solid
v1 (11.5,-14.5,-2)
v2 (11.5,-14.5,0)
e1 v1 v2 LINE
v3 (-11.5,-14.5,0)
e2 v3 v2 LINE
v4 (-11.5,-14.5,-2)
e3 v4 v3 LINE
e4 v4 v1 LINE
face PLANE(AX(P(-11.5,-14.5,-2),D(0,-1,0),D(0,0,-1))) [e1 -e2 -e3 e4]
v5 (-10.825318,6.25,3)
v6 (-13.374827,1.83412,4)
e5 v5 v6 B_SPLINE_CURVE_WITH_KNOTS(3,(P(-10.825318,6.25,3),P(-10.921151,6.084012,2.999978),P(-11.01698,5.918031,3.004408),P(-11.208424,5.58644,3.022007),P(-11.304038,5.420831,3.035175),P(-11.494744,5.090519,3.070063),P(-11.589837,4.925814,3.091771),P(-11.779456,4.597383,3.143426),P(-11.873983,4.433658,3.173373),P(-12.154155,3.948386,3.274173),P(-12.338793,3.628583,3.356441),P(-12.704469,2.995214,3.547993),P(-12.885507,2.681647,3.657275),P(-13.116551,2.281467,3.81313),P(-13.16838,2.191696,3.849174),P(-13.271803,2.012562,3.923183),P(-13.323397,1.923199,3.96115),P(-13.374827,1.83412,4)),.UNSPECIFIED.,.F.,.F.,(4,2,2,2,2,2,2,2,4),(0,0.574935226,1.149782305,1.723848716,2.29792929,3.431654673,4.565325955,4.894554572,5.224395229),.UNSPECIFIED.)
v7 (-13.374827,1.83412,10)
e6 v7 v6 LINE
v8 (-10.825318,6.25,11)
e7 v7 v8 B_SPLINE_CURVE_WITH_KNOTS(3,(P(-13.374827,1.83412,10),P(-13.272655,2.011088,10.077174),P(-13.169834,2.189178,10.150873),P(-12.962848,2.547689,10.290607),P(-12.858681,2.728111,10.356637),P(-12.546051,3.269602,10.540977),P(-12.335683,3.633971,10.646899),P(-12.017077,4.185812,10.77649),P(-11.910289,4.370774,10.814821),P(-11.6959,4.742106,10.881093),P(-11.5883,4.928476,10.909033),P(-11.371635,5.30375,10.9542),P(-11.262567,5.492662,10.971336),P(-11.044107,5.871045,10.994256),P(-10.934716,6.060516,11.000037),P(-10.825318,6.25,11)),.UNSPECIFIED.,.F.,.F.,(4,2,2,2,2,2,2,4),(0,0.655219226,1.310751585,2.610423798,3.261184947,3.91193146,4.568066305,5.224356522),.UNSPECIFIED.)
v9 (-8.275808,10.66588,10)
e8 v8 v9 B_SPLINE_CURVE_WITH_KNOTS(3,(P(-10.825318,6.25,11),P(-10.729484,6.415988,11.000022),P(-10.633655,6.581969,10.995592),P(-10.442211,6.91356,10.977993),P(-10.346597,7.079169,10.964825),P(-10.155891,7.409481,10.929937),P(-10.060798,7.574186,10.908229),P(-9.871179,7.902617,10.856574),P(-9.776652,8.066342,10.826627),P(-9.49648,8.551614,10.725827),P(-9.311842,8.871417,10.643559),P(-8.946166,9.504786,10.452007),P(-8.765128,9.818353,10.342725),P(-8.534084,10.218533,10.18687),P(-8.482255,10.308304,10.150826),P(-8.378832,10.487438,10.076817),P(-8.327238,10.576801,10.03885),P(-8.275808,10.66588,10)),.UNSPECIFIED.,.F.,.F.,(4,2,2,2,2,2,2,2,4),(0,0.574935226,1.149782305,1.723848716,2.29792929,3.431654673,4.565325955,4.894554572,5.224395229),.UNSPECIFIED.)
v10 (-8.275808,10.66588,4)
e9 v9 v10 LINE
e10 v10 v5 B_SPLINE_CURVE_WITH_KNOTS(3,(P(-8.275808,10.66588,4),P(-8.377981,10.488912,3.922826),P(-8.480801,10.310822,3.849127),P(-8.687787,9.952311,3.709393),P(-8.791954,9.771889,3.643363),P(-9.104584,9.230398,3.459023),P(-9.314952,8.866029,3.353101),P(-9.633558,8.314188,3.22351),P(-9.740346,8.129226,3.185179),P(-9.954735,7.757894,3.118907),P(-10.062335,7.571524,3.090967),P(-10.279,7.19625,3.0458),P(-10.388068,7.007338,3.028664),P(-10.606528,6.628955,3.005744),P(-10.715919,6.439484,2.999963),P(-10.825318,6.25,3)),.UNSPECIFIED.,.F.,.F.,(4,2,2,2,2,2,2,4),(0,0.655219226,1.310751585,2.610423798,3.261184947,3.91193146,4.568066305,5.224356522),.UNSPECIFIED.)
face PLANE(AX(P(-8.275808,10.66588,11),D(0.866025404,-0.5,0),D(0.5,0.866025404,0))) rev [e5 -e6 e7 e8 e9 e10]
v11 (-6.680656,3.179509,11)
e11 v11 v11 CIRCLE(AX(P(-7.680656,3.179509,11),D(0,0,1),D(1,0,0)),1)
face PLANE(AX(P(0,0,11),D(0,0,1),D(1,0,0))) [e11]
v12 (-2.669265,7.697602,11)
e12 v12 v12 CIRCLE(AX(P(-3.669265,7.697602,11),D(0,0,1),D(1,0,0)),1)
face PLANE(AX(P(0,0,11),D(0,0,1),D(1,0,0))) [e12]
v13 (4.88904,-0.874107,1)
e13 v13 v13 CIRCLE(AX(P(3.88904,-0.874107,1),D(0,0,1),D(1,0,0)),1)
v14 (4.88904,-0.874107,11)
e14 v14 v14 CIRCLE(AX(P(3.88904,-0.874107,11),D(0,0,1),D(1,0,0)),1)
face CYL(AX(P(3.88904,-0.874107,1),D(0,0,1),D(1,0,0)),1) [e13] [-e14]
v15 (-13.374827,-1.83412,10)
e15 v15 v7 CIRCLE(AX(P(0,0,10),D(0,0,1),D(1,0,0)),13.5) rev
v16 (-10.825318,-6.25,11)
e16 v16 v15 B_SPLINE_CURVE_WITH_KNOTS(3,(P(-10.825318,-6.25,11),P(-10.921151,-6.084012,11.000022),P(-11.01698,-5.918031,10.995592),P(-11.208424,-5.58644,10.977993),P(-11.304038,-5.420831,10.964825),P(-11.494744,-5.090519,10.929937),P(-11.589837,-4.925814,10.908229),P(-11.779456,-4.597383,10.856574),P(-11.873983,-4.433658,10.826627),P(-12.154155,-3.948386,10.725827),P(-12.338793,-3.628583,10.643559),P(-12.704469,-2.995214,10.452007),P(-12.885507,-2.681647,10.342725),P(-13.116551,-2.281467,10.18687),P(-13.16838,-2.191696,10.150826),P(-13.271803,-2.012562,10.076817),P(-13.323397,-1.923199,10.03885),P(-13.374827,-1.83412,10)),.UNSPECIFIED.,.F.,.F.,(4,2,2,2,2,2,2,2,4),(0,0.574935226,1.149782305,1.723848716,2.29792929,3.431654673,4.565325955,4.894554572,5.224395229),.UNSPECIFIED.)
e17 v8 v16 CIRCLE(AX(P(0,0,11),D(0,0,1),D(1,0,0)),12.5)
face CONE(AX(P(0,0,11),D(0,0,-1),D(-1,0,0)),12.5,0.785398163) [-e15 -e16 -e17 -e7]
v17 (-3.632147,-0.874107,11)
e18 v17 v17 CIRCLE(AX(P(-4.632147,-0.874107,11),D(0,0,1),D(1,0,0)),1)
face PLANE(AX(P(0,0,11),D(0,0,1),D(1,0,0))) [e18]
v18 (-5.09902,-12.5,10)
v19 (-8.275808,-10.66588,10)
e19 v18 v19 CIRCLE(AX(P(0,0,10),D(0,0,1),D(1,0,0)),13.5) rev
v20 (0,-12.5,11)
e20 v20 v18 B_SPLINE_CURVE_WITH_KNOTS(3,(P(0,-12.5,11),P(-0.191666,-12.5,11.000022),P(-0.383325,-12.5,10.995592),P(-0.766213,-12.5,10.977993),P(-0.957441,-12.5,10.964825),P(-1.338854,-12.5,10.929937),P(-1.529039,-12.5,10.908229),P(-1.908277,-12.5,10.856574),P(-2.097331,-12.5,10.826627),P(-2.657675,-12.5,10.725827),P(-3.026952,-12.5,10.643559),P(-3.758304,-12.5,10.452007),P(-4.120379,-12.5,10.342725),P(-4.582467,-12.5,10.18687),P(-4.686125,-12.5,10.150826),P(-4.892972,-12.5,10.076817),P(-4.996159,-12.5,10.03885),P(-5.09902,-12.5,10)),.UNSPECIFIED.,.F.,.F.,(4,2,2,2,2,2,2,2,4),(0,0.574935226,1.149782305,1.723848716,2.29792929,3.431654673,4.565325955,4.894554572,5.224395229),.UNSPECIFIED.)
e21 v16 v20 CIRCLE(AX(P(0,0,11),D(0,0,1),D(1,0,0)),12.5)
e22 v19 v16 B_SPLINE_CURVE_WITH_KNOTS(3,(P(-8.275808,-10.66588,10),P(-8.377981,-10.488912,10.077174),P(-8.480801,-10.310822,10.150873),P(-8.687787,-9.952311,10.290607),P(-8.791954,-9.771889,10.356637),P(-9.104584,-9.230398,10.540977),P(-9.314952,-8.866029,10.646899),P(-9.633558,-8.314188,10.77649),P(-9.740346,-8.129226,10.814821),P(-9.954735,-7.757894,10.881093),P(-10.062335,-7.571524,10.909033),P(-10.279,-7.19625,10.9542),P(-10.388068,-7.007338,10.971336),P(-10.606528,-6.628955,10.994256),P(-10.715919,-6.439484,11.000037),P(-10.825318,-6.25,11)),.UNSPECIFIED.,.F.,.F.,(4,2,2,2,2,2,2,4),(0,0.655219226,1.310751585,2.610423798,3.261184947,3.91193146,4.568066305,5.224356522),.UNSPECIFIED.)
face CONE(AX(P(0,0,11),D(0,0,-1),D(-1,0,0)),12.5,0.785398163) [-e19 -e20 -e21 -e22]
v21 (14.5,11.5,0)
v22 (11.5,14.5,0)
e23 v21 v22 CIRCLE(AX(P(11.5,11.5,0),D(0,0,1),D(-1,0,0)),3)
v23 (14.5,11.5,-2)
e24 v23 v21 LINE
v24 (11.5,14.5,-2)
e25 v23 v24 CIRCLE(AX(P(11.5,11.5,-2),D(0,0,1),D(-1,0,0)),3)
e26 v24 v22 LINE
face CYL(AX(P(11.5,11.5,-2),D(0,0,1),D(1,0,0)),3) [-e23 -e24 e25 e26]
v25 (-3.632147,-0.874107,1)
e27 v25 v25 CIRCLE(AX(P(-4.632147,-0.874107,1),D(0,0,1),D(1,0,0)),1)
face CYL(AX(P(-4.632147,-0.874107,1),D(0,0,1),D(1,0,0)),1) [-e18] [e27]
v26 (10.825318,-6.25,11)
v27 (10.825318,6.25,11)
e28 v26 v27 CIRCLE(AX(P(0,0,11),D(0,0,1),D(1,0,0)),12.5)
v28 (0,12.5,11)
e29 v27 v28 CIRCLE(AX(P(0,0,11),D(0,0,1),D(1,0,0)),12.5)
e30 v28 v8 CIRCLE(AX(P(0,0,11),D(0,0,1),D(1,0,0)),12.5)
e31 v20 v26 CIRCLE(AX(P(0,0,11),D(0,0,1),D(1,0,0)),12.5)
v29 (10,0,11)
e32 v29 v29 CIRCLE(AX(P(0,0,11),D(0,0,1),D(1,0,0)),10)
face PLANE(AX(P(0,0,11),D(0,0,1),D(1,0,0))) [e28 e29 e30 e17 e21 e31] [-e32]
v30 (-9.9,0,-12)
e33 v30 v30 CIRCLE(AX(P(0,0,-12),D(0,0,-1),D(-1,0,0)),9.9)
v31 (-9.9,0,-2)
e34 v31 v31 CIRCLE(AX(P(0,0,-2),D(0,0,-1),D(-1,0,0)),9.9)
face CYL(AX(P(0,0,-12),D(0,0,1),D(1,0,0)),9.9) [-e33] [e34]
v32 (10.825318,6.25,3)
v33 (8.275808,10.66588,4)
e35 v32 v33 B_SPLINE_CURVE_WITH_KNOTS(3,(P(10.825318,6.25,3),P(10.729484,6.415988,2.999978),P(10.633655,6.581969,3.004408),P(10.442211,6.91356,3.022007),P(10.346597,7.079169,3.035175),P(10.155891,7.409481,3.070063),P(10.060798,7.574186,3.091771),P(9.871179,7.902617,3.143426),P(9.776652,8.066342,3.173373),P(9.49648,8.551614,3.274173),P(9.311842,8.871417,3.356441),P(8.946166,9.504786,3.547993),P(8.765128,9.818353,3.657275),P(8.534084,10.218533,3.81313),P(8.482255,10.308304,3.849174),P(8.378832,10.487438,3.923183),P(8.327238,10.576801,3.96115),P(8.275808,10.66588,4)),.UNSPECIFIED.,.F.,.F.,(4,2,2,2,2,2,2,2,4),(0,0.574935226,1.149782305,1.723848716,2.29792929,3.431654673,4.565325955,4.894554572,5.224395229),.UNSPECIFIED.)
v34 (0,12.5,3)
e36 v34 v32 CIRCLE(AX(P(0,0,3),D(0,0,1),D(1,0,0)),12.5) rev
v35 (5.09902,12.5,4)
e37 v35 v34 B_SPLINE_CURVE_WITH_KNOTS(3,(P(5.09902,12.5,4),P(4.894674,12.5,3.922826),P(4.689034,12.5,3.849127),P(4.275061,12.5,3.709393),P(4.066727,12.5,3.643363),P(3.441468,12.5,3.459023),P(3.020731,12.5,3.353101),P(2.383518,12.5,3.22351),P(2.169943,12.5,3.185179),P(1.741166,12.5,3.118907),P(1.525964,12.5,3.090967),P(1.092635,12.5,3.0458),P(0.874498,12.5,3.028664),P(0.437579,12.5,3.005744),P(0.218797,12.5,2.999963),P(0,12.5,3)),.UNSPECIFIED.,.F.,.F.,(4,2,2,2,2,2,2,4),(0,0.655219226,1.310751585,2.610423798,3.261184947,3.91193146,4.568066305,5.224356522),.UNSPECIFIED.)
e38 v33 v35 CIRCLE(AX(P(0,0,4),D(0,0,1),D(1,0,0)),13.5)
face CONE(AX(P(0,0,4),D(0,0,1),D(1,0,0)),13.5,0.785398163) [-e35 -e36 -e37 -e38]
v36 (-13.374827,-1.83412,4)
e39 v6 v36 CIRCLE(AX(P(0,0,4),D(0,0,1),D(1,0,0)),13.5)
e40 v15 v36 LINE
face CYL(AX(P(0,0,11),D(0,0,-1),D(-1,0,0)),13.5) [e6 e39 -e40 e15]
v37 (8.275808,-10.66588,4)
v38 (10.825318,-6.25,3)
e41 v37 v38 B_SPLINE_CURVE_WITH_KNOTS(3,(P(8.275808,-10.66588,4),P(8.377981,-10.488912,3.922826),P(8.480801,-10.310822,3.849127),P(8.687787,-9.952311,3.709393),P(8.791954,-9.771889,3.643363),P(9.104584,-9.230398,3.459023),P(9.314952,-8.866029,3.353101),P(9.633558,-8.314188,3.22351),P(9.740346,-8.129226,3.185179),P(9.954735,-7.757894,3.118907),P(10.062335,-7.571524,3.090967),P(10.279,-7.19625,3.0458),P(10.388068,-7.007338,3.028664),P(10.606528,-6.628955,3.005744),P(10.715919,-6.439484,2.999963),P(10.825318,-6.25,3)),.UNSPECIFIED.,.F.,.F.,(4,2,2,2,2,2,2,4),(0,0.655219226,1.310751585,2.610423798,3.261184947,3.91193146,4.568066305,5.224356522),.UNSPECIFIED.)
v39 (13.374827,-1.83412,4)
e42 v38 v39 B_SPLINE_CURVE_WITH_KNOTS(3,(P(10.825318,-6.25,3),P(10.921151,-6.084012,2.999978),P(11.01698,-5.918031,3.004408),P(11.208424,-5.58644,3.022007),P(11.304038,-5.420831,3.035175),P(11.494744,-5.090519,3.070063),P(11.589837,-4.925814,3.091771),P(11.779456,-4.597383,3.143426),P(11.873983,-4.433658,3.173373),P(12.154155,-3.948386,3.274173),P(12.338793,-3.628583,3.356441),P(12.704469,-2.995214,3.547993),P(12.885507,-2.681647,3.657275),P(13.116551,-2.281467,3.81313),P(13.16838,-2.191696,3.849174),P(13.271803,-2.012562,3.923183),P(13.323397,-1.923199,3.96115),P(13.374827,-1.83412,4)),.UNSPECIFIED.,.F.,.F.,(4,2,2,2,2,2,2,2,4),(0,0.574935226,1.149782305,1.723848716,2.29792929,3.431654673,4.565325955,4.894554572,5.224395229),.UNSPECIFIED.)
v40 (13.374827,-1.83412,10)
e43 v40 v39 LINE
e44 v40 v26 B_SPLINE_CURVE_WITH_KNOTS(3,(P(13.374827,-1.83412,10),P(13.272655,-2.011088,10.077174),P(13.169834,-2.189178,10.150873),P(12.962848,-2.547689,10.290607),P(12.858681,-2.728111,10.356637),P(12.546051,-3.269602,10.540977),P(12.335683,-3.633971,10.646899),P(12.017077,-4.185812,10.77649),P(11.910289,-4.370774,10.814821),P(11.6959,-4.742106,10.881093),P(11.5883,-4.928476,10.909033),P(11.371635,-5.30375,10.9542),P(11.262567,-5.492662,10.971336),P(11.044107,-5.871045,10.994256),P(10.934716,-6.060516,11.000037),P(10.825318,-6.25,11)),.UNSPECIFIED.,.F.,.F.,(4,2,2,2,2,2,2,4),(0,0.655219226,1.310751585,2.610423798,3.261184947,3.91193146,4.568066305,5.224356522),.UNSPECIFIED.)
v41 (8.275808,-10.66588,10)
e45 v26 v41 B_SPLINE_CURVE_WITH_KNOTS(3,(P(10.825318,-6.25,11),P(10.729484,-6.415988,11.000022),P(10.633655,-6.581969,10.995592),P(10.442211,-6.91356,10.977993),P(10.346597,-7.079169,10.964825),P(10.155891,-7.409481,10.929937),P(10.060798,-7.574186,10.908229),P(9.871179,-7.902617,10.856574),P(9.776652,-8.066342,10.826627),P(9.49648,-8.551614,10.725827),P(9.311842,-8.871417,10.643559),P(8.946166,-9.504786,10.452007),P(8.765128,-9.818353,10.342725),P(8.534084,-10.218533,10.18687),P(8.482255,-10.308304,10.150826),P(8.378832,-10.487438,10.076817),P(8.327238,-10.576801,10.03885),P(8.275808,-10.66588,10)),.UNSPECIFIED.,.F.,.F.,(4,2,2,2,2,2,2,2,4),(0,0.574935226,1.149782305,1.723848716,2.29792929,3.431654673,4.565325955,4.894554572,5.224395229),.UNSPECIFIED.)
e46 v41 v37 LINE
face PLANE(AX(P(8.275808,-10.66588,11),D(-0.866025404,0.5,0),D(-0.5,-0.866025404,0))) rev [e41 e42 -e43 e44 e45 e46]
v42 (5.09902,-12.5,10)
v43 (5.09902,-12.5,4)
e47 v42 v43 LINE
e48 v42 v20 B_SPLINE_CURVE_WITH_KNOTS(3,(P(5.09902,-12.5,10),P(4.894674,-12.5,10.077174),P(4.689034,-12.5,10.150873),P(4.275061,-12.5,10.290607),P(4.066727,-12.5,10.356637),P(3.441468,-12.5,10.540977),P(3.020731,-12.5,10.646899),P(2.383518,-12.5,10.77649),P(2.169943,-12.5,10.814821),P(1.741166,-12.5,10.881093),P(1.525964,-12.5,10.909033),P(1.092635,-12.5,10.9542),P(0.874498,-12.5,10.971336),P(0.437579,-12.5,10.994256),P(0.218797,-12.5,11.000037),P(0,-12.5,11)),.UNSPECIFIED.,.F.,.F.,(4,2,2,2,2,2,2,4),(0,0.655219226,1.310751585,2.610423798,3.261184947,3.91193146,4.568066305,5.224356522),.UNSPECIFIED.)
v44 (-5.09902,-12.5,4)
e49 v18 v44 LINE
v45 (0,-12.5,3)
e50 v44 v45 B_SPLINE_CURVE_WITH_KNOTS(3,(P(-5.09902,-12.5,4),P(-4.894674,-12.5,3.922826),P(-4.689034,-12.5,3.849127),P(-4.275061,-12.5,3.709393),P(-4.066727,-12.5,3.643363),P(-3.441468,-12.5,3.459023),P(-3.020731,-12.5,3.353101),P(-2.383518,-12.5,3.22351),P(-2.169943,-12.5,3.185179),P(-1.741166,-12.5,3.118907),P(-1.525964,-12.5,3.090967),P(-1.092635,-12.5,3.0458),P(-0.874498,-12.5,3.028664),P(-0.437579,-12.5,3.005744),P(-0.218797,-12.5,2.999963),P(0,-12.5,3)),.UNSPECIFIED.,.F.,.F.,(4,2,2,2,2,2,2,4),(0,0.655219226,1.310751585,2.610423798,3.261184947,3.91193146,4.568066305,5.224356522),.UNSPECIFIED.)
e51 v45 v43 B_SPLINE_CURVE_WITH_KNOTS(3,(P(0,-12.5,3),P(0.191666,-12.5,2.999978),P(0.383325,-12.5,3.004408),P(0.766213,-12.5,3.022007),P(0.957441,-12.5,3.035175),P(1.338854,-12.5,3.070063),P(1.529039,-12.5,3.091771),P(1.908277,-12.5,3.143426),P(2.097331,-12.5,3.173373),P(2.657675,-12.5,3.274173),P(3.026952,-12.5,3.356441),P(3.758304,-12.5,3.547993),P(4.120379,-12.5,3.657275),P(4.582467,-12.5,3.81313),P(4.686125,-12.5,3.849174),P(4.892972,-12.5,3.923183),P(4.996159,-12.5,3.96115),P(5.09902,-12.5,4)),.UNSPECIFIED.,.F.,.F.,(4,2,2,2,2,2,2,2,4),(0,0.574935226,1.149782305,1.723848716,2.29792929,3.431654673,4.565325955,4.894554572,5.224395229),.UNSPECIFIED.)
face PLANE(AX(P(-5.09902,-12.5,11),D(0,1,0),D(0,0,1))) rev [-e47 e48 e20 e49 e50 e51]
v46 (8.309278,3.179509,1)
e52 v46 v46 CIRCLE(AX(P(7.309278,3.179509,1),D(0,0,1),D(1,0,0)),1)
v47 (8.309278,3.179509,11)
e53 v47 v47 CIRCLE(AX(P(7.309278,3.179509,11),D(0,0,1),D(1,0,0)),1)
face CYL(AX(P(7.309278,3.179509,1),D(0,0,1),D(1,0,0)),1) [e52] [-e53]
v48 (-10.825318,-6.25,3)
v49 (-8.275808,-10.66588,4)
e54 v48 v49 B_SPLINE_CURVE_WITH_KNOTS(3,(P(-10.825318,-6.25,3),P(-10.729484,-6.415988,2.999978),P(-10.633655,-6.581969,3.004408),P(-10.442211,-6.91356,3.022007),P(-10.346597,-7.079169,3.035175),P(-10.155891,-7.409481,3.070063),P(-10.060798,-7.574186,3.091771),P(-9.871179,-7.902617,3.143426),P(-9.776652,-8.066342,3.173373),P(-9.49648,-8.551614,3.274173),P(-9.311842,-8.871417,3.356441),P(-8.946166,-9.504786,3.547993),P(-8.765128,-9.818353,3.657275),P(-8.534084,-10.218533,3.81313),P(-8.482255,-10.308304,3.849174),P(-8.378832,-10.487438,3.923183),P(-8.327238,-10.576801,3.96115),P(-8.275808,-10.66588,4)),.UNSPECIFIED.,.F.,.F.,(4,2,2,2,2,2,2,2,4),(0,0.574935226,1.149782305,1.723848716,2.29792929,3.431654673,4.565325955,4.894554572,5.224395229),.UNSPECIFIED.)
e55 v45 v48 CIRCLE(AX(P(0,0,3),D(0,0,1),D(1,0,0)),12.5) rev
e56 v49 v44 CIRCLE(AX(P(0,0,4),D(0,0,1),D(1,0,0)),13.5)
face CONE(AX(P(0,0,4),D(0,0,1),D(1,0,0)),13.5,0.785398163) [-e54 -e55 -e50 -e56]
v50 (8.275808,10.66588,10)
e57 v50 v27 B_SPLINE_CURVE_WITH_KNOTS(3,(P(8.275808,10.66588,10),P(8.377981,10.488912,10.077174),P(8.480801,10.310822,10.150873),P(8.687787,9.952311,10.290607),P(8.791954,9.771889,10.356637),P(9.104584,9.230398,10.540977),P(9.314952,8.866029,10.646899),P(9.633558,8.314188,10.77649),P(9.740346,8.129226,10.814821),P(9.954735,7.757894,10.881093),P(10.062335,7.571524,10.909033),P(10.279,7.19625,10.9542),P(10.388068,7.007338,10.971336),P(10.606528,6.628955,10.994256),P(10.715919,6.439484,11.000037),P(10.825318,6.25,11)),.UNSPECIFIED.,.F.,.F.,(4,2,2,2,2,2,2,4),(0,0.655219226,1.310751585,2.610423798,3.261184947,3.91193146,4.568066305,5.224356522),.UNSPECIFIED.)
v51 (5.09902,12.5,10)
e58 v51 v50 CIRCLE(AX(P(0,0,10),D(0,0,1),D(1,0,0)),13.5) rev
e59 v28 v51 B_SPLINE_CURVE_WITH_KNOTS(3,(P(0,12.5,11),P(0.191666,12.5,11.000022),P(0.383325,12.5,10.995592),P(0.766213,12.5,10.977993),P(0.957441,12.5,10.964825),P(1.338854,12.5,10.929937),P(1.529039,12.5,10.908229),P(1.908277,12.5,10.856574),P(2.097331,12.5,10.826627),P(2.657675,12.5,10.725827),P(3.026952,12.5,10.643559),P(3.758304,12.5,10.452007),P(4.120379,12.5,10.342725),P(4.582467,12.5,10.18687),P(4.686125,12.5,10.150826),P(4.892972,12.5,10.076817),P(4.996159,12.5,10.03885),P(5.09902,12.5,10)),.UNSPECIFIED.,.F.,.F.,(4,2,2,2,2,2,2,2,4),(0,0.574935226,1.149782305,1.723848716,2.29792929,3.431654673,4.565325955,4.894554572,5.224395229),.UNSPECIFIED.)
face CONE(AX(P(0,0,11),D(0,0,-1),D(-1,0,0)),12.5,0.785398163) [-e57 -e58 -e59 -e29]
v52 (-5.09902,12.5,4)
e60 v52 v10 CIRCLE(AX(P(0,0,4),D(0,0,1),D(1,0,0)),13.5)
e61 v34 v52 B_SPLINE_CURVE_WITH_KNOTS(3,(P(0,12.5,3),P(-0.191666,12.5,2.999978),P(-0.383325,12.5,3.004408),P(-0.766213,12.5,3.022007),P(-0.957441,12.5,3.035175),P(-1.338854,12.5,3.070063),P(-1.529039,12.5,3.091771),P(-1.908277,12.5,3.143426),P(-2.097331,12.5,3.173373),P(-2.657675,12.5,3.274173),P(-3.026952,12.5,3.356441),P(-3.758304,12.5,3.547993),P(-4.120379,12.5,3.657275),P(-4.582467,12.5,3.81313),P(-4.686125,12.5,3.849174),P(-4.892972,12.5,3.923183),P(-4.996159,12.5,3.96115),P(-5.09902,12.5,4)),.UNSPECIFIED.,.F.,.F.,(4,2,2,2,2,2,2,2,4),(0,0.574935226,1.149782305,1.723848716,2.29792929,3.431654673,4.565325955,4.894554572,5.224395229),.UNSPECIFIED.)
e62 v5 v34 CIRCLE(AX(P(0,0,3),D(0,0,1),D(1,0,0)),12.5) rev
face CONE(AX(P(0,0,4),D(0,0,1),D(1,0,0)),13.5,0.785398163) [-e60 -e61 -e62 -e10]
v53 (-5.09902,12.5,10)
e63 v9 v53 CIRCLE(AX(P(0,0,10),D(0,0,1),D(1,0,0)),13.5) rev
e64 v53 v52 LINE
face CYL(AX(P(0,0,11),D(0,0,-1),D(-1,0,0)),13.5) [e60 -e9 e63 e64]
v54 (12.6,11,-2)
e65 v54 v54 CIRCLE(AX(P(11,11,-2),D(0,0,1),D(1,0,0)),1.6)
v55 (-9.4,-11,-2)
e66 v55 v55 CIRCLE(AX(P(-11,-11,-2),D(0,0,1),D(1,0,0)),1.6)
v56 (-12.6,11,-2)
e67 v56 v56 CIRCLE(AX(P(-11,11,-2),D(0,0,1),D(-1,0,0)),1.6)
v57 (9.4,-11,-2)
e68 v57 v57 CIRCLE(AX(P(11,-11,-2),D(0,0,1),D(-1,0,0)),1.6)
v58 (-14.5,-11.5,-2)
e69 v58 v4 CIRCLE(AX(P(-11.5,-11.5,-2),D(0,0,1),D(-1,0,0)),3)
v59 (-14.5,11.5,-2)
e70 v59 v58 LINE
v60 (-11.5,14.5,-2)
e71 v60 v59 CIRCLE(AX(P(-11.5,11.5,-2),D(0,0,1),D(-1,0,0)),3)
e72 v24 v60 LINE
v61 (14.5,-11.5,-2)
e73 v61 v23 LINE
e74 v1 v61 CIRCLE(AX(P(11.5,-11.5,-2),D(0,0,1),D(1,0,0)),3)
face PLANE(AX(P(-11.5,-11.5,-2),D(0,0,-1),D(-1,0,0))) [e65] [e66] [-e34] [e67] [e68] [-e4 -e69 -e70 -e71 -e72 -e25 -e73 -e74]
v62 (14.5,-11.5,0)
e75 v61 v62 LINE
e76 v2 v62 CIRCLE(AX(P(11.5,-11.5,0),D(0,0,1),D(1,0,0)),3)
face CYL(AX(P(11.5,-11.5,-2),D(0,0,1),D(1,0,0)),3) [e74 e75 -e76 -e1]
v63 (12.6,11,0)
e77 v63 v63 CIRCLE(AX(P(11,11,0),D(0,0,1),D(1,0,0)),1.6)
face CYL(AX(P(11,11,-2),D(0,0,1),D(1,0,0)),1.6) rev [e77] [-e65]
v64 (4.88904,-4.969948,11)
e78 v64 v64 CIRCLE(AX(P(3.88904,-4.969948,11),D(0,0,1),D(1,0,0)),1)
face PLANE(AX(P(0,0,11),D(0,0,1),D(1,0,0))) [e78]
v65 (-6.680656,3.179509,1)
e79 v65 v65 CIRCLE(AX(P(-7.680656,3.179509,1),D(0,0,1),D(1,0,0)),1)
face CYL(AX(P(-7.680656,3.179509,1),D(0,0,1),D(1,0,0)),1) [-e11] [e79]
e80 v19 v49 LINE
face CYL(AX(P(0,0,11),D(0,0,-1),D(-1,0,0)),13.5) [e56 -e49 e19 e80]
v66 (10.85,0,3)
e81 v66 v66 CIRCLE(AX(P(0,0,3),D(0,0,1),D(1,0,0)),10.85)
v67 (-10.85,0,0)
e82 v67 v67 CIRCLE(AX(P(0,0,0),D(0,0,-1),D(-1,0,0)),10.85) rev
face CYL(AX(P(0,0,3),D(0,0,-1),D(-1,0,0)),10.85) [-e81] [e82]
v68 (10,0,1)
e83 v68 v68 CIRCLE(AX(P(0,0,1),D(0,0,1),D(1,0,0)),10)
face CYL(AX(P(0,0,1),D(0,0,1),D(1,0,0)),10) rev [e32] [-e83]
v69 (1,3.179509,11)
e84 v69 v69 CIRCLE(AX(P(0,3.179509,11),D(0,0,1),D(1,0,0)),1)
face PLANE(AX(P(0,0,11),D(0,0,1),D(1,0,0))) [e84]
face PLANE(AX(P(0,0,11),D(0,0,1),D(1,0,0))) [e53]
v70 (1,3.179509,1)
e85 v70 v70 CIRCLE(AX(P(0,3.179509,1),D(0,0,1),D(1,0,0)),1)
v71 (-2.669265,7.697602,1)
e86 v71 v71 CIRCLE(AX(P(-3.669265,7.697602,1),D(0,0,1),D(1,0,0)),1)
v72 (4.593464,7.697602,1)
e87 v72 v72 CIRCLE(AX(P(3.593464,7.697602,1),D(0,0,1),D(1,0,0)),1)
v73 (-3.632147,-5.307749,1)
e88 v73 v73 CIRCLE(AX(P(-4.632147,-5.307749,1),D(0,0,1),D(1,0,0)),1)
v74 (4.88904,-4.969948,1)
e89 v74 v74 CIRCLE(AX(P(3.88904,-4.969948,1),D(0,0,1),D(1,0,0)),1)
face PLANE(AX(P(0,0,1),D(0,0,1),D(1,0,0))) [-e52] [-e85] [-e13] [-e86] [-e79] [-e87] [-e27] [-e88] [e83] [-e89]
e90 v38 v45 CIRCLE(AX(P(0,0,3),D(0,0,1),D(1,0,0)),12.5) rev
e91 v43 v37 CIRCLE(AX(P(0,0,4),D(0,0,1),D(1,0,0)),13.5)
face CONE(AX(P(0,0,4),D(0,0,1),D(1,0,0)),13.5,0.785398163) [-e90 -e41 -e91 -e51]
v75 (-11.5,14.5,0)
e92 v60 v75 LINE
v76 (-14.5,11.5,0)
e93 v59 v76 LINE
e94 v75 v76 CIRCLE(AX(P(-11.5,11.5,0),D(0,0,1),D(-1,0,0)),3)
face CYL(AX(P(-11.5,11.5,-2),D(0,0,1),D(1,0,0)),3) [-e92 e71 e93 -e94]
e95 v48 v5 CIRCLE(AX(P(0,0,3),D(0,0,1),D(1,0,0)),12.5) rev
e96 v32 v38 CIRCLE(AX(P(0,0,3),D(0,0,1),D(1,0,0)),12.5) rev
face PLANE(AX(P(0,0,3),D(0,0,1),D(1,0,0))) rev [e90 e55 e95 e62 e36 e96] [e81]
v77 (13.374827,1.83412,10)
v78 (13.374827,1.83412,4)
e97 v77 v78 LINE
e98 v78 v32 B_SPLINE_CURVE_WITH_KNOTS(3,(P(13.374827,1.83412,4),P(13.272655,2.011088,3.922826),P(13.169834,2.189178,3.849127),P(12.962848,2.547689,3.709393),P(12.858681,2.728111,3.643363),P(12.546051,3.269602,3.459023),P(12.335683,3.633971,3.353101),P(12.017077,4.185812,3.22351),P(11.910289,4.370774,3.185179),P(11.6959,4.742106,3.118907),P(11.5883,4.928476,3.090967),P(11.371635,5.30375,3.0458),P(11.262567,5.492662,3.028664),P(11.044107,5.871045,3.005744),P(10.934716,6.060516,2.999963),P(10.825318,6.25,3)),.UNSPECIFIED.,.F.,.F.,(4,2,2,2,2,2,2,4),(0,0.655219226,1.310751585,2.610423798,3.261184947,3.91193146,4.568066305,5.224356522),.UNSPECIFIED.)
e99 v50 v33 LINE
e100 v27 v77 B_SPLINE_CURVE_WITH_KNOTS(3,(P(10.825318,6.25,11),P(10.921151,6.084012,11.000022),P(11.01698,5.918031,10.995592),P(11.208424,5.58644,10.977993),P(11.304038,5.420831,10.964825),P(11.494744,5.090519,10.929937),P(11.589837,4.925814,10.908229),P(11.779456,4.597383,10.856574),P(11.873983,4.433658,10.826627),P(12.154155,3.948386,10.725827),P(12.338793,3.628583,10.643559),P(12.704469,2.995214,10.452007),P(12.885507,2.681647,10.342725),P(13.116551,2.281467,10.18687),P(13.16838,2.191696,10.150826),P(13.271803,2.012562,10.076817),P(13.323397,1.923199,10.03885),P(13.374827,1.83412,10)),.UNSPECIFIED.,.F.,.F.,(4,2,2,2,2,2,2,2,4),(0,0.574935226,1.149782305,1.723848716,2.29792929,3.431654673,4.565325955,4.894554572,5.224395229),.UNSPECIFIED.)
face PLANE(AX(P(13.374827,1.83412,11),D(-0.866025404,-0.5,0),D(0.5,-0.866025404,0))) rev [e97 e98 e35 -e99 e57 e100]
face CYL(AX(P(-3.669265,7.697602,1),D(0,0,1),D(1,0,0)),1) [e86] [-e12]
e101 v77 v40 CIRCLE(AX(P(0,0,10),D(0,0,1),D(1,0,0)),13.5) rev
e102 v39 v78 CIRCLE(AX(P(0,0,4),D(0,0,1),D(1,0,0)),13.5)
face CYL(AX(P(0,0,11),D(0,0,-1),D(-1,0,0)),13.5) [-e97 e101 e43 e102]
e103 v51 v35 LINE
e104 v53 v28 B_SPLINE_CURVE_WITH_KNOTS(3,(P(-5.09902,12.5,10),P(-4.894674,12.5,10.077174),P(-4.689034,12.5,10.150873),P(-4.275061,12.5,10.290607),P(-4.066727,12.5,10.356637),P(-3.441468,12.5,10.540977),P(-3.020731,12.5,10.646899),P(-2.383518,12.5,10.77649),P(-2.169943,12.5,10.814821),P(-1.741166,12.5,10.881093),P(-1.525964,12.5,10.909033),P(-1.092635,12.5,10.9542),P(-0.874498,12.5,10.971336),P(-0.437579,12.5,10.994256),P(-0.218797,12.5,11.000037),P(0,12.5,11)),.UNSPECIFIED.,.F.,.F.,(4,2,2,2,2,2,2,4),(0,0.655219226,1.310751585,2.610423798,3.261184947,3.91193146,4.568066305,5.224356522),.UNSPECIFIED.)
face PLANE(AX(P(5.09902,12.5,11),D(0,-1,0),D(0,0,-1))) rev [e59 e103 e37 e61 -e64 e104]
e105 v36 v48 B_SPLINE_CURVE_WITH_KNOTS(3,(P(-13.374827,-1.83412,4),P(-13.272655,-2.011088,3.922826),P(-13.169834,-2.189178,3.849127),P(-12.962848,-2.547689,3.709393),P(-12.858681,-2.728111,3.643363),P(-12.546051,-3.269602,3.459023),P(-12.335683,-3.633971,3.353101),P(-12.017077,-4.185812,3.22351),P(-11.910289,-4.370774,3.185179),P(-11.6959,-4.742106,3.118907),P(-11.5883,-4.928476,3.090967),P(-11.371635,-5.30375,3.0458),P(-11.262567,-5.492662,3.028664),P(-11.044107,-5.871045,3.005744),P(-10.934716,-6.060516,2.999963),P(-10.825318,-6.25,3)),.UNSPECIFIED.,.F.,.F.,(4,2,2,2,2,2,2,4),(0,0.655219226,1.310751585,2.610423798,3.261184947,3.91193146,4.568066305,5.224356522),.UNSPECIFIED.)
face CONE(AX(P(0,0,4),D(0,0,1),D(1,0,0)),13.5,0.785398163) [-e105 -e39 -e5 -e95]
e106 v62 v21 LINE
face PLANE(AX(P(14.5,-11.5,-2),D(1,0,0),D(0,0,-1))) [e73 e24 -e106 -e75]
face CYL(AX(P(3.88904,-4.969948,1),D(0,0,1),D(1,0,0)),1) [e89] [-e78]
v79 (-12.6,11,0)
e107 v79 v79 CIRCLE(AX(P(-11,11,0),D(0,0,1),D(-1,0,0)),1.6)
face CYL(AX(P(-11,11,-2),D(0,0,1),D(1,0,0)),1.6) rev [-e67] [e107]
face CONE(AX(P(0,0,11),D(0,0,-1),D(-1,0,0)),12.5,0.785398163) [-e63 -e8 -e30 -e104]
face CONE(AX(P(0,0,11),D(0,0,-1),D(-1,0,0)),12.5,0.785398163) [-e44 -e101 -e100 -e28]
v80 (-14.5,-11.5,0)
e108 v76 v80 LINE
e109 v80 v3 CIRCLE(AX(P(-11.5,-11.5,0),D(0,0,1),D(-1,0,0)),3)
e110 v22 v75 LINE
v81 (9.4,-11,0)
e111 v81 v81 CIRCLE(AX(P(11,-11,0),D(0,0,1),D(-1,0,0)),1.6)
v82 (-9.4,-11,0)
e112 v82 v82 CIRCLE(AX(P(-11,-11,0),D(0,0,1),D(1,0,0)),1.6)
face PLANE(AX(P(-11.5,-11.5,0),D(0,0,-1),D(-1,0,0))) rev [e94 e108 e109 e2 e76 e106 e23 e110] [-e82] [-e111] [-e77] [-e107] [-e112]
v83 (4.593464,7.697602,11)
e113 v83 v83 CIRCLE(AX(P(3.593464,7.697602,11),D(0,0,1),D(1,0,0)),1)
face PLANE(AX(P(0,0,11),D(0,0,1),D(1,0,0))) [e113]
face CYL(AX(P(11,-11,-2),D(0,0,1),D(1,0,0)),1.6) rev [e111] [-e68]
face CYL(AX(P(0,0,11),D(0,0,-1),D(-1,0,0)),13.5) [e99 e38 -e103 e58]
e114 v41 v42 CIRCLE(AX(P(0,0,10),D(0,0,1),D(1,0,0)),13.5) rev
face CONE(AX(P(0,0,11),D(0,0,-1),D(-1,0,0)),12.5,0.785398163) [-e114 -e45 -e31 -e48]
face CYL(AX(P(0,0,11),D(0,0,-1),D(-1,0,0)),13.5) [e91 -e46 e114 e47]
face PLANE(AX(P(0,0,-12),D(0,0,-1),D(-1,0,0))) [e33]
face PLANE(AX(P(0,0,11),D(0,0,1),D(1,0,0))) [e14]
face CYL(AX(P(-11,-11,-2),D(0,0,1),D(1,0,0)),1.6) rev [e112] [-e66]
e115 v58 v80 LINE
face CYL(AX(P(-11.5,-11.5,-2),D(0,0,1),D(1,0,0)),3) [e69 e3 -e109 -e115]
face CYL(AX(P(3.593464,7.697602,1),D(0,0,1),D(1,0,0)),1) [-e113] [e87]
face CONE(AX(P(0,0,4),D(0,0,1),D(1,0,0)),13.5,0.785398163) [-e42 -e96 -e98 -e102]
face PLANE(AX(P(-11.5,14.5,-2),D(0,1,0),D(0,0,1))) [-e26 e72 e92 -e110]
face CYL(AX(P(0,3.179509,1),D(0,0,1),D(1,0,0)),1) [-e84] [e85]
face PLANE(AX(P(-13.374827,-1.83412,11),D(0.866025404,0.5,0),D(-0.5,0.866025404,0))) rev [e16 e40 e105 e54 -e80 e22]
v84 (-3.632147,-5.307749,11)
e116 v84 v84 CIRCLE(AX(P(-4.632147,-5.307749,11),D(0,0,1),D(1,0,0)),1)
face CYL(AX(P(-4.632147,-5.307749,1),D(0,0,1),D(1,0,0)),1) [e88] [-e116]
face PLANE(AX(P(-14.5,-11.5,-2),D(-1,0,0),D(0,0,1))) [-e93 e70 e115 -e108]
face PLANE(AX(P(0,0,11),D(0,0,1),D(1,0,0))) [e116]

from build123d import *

# Parameters (mm, degrees)
SKETCH_1_R          = 1.6
EXTRUDE_1_DEPTH     = 2
SKETCH_2_R          = 10.85
EXTRUDE_2_DEPTH     = 3
EXTRUDE_3_DEPTH     = 8
SKETCH_4_R          = 9.9
EXTRUDE_4_DEPTH     = 10
CHAMFER_1_SIZE      = 1
CHAMFER_2_SIZE      = 1
SKETCH_5_R          = 10
SKETCH_5_R_2        = 1
CUT_EXTRUDE_1_DEPTH = 10


with BuildPart() as part:
    # 草图1 → 凸台-拉伸1 (new body)
    with BuildSketch(Plane.XY):
        with BuildLine():
            Line((-11.5, -14.5), (11.5, -14.5))
            ThreePointArc((11.5, -14.5), (13.621320344, -13.621320344), (14.5, -11.5))
            Line((14.5, -11.5), (14.5, 11.5))
            ThreePointArc((14.5, 11.5), (13.621320344, 13.621320344), (11.5, 14.5))
            Line((11.5, 14.5), (-11.5, 14.5))
            ThreePointArc((-11.5, 14.5), (-13.621320344, 13.621320344), (-14.5, 11.5))
            Line((-14.5, 11.5), (-14.5, -11.5))
            ThreePointArc((-14.5, -11.5), (-13.621320344, -13.621320344), (-11.5, -14.5))
        make_face()
        with Locations((11, 11)):
            Circle(SKETCH_1_R, mode=Mode.SUBTRACT)
        with Locations(Location((-11, 11, 0), (0, 0, 180))):
            Circle(SKETCH_1_R, mode=Mode.SUBTRACT)
        with Locations((-11, -11)):
            Circle(SKETCH_1_R, mode=Mode.SUBTRACT)
        with Locations(Location((11, -11, 0), (0, 0, 180))):
            Circle(SKETCH_1_R, mode=Mode.SUBTRACT)
    extrude(amount=-EXTRUDE_1_DEPTH)

    # 草图2 → 凸台-拉伸2 (add)
    with BuildSketch(Plane.XY):
        with Locations(Location((0, 0, 0), (0, 0, 180))):
            Circle(SKETCH_2_R)
    extrude(amount=EXTRUDE_2_DEPTH)

    # 草图3 → 凸台-拉伸3 (add)
    with BuildSketch(Plane.XY.offset(3)):
        with BuildLine():
            Line((13.374827304, 1.834119567), (8.275807791, 10.665880433))
            ThreePointArc((8.275807791, 10.665880433), (6.75, 11.691342951), (5.099019514, 12.5))
            Line((5.099019514, 12.5), (-5.099019514, 12.5))
            ThreePointArc((-5.099019514, 12.5), (-6.75, 11.691342951), (-8.275807791, 10.665880433))
            Line((-8.275807791, 10.665880433), (-13.374827304, 1.834119567))
            ThreePointArc((-13.374827304, 1.834119567), (-13.5, 0), (-13.374827304, -1.834119567))
            Line((-13.374827304, -1.834119567), (-8.275807791, -10.665880433))
            ThreePointArc((-8.275807791, -10.665880433), (-6.75, -11.691342951), (-5.099019514, -12.5))
            Line((-5.099019514, -12.5), (5.099019514, -12.5))
            ThreePointArc((5.099019514, -12.5), (6.75, -11.691342951), (8.275807791, -10.665880433))
            Line((8.275807791, -10.665880433), (13.374827304, -1.834119567))
            ThreePointArc((13.374827304, -1.834119567), (13.5, 0), (13.374827304, 1.834119567))
        make_face()
    extrude(amount=EXTRUDE_3_DEPTH)

    # 草图4 → 凸台-拉伸4 (add)
    with BuildSketch(Plane(origin=(0, 0, -2), x_dir=(-1, 0, 0), z_dir=(0, 0, -1))):
        Circle(SKETCH_4_R)
    extrude(amount=EXTRUDE_4_DEPTH)

    # 倒角1
    chamfer_1_edges = [part.edges().sort_by_distance(p)[0] for p in [
        (-6.75, -11.691342951, 3),
        (-13.5, 0, 3),
        (-6.75, 11.691342951, 3),
        (6.75, 11.691342951, 3),
        (6.75, -11.691342951, 3),
        (13.5, 0, 3),
    ]]
    chamfer(chamfer_1_edges, length=CHAMFER_1_SIZE - 0.0001)  # a hair under: the kernel refuses the full size

    # 倒角2
    chamfer_2_edges = [part.edges().sort_by_distance(p)[0] for p in [
        (13.5, 0, 11),
        (6.75, 11.691342951, 11),
        (6.75, -11.691342951, 11),
        (-6.75, -11.691342951, 11),
        (-6.75, 11.691342951, 11),
        (-13.5, 0, 11),
    ]]
    chamfer(chamfer_2_edges, length=CHAMFER_2_SIZE - 0.0001)  # a hair under: the kernel refuses the full size

    # 草图5 → 切除-拉伸1 (cut)
    with BuildSketch(Plane.XY.offset(11)):
        Circle(SKETCH_5_R)
        with Locations((-3.66926495, 7.697601599)):
            Circle(SKETCH_5_R_2, mode=Mode.SUBTRACT)
        with Locations((3.593463585, 7.697601599)):
            Circle(SKETCH_5_R_2, mode=Mode.SUBTRACT)
        with Locations((-7.680655711, 3.179508847)):
            Circle(SKETCH_5_R_2, mode=Mode.SUBTRACT)
        with Locations((0, 3.179508847)):
            Circle(SKETCH_5_R_2, mode=Mode.SUBTRACT)
        with Locations((7.309278185, 3.179508847)):
            Circle(SKETCH_5_R_2, mode=Mode.SUBTRACT)
        with Locations((-4.63214688, -0.87410708)):
            Circle(SKETCH_5_R_2, mode=Mode.SUBTRACT)
        with Locations((3.889039747, -0.87410708)):
            Circle(SKETCH_5_R_2, mode=Mode.SUBTRACT)
        with Locations((-4.63214688, -5.3077495)):
            Circle(SKETCH_5_R_2, mode=Mode.SUBTRACT)
        with Locations((3.889039747, -4.969948172)):
            Circle(SKETCH_5_R_2, mode=Mode.SUBTRACT)
    extrude(amount=-CUT_EXTRUDE_1_DEPTH, mode=Mode.SUBTRACT)


solid = part.part
